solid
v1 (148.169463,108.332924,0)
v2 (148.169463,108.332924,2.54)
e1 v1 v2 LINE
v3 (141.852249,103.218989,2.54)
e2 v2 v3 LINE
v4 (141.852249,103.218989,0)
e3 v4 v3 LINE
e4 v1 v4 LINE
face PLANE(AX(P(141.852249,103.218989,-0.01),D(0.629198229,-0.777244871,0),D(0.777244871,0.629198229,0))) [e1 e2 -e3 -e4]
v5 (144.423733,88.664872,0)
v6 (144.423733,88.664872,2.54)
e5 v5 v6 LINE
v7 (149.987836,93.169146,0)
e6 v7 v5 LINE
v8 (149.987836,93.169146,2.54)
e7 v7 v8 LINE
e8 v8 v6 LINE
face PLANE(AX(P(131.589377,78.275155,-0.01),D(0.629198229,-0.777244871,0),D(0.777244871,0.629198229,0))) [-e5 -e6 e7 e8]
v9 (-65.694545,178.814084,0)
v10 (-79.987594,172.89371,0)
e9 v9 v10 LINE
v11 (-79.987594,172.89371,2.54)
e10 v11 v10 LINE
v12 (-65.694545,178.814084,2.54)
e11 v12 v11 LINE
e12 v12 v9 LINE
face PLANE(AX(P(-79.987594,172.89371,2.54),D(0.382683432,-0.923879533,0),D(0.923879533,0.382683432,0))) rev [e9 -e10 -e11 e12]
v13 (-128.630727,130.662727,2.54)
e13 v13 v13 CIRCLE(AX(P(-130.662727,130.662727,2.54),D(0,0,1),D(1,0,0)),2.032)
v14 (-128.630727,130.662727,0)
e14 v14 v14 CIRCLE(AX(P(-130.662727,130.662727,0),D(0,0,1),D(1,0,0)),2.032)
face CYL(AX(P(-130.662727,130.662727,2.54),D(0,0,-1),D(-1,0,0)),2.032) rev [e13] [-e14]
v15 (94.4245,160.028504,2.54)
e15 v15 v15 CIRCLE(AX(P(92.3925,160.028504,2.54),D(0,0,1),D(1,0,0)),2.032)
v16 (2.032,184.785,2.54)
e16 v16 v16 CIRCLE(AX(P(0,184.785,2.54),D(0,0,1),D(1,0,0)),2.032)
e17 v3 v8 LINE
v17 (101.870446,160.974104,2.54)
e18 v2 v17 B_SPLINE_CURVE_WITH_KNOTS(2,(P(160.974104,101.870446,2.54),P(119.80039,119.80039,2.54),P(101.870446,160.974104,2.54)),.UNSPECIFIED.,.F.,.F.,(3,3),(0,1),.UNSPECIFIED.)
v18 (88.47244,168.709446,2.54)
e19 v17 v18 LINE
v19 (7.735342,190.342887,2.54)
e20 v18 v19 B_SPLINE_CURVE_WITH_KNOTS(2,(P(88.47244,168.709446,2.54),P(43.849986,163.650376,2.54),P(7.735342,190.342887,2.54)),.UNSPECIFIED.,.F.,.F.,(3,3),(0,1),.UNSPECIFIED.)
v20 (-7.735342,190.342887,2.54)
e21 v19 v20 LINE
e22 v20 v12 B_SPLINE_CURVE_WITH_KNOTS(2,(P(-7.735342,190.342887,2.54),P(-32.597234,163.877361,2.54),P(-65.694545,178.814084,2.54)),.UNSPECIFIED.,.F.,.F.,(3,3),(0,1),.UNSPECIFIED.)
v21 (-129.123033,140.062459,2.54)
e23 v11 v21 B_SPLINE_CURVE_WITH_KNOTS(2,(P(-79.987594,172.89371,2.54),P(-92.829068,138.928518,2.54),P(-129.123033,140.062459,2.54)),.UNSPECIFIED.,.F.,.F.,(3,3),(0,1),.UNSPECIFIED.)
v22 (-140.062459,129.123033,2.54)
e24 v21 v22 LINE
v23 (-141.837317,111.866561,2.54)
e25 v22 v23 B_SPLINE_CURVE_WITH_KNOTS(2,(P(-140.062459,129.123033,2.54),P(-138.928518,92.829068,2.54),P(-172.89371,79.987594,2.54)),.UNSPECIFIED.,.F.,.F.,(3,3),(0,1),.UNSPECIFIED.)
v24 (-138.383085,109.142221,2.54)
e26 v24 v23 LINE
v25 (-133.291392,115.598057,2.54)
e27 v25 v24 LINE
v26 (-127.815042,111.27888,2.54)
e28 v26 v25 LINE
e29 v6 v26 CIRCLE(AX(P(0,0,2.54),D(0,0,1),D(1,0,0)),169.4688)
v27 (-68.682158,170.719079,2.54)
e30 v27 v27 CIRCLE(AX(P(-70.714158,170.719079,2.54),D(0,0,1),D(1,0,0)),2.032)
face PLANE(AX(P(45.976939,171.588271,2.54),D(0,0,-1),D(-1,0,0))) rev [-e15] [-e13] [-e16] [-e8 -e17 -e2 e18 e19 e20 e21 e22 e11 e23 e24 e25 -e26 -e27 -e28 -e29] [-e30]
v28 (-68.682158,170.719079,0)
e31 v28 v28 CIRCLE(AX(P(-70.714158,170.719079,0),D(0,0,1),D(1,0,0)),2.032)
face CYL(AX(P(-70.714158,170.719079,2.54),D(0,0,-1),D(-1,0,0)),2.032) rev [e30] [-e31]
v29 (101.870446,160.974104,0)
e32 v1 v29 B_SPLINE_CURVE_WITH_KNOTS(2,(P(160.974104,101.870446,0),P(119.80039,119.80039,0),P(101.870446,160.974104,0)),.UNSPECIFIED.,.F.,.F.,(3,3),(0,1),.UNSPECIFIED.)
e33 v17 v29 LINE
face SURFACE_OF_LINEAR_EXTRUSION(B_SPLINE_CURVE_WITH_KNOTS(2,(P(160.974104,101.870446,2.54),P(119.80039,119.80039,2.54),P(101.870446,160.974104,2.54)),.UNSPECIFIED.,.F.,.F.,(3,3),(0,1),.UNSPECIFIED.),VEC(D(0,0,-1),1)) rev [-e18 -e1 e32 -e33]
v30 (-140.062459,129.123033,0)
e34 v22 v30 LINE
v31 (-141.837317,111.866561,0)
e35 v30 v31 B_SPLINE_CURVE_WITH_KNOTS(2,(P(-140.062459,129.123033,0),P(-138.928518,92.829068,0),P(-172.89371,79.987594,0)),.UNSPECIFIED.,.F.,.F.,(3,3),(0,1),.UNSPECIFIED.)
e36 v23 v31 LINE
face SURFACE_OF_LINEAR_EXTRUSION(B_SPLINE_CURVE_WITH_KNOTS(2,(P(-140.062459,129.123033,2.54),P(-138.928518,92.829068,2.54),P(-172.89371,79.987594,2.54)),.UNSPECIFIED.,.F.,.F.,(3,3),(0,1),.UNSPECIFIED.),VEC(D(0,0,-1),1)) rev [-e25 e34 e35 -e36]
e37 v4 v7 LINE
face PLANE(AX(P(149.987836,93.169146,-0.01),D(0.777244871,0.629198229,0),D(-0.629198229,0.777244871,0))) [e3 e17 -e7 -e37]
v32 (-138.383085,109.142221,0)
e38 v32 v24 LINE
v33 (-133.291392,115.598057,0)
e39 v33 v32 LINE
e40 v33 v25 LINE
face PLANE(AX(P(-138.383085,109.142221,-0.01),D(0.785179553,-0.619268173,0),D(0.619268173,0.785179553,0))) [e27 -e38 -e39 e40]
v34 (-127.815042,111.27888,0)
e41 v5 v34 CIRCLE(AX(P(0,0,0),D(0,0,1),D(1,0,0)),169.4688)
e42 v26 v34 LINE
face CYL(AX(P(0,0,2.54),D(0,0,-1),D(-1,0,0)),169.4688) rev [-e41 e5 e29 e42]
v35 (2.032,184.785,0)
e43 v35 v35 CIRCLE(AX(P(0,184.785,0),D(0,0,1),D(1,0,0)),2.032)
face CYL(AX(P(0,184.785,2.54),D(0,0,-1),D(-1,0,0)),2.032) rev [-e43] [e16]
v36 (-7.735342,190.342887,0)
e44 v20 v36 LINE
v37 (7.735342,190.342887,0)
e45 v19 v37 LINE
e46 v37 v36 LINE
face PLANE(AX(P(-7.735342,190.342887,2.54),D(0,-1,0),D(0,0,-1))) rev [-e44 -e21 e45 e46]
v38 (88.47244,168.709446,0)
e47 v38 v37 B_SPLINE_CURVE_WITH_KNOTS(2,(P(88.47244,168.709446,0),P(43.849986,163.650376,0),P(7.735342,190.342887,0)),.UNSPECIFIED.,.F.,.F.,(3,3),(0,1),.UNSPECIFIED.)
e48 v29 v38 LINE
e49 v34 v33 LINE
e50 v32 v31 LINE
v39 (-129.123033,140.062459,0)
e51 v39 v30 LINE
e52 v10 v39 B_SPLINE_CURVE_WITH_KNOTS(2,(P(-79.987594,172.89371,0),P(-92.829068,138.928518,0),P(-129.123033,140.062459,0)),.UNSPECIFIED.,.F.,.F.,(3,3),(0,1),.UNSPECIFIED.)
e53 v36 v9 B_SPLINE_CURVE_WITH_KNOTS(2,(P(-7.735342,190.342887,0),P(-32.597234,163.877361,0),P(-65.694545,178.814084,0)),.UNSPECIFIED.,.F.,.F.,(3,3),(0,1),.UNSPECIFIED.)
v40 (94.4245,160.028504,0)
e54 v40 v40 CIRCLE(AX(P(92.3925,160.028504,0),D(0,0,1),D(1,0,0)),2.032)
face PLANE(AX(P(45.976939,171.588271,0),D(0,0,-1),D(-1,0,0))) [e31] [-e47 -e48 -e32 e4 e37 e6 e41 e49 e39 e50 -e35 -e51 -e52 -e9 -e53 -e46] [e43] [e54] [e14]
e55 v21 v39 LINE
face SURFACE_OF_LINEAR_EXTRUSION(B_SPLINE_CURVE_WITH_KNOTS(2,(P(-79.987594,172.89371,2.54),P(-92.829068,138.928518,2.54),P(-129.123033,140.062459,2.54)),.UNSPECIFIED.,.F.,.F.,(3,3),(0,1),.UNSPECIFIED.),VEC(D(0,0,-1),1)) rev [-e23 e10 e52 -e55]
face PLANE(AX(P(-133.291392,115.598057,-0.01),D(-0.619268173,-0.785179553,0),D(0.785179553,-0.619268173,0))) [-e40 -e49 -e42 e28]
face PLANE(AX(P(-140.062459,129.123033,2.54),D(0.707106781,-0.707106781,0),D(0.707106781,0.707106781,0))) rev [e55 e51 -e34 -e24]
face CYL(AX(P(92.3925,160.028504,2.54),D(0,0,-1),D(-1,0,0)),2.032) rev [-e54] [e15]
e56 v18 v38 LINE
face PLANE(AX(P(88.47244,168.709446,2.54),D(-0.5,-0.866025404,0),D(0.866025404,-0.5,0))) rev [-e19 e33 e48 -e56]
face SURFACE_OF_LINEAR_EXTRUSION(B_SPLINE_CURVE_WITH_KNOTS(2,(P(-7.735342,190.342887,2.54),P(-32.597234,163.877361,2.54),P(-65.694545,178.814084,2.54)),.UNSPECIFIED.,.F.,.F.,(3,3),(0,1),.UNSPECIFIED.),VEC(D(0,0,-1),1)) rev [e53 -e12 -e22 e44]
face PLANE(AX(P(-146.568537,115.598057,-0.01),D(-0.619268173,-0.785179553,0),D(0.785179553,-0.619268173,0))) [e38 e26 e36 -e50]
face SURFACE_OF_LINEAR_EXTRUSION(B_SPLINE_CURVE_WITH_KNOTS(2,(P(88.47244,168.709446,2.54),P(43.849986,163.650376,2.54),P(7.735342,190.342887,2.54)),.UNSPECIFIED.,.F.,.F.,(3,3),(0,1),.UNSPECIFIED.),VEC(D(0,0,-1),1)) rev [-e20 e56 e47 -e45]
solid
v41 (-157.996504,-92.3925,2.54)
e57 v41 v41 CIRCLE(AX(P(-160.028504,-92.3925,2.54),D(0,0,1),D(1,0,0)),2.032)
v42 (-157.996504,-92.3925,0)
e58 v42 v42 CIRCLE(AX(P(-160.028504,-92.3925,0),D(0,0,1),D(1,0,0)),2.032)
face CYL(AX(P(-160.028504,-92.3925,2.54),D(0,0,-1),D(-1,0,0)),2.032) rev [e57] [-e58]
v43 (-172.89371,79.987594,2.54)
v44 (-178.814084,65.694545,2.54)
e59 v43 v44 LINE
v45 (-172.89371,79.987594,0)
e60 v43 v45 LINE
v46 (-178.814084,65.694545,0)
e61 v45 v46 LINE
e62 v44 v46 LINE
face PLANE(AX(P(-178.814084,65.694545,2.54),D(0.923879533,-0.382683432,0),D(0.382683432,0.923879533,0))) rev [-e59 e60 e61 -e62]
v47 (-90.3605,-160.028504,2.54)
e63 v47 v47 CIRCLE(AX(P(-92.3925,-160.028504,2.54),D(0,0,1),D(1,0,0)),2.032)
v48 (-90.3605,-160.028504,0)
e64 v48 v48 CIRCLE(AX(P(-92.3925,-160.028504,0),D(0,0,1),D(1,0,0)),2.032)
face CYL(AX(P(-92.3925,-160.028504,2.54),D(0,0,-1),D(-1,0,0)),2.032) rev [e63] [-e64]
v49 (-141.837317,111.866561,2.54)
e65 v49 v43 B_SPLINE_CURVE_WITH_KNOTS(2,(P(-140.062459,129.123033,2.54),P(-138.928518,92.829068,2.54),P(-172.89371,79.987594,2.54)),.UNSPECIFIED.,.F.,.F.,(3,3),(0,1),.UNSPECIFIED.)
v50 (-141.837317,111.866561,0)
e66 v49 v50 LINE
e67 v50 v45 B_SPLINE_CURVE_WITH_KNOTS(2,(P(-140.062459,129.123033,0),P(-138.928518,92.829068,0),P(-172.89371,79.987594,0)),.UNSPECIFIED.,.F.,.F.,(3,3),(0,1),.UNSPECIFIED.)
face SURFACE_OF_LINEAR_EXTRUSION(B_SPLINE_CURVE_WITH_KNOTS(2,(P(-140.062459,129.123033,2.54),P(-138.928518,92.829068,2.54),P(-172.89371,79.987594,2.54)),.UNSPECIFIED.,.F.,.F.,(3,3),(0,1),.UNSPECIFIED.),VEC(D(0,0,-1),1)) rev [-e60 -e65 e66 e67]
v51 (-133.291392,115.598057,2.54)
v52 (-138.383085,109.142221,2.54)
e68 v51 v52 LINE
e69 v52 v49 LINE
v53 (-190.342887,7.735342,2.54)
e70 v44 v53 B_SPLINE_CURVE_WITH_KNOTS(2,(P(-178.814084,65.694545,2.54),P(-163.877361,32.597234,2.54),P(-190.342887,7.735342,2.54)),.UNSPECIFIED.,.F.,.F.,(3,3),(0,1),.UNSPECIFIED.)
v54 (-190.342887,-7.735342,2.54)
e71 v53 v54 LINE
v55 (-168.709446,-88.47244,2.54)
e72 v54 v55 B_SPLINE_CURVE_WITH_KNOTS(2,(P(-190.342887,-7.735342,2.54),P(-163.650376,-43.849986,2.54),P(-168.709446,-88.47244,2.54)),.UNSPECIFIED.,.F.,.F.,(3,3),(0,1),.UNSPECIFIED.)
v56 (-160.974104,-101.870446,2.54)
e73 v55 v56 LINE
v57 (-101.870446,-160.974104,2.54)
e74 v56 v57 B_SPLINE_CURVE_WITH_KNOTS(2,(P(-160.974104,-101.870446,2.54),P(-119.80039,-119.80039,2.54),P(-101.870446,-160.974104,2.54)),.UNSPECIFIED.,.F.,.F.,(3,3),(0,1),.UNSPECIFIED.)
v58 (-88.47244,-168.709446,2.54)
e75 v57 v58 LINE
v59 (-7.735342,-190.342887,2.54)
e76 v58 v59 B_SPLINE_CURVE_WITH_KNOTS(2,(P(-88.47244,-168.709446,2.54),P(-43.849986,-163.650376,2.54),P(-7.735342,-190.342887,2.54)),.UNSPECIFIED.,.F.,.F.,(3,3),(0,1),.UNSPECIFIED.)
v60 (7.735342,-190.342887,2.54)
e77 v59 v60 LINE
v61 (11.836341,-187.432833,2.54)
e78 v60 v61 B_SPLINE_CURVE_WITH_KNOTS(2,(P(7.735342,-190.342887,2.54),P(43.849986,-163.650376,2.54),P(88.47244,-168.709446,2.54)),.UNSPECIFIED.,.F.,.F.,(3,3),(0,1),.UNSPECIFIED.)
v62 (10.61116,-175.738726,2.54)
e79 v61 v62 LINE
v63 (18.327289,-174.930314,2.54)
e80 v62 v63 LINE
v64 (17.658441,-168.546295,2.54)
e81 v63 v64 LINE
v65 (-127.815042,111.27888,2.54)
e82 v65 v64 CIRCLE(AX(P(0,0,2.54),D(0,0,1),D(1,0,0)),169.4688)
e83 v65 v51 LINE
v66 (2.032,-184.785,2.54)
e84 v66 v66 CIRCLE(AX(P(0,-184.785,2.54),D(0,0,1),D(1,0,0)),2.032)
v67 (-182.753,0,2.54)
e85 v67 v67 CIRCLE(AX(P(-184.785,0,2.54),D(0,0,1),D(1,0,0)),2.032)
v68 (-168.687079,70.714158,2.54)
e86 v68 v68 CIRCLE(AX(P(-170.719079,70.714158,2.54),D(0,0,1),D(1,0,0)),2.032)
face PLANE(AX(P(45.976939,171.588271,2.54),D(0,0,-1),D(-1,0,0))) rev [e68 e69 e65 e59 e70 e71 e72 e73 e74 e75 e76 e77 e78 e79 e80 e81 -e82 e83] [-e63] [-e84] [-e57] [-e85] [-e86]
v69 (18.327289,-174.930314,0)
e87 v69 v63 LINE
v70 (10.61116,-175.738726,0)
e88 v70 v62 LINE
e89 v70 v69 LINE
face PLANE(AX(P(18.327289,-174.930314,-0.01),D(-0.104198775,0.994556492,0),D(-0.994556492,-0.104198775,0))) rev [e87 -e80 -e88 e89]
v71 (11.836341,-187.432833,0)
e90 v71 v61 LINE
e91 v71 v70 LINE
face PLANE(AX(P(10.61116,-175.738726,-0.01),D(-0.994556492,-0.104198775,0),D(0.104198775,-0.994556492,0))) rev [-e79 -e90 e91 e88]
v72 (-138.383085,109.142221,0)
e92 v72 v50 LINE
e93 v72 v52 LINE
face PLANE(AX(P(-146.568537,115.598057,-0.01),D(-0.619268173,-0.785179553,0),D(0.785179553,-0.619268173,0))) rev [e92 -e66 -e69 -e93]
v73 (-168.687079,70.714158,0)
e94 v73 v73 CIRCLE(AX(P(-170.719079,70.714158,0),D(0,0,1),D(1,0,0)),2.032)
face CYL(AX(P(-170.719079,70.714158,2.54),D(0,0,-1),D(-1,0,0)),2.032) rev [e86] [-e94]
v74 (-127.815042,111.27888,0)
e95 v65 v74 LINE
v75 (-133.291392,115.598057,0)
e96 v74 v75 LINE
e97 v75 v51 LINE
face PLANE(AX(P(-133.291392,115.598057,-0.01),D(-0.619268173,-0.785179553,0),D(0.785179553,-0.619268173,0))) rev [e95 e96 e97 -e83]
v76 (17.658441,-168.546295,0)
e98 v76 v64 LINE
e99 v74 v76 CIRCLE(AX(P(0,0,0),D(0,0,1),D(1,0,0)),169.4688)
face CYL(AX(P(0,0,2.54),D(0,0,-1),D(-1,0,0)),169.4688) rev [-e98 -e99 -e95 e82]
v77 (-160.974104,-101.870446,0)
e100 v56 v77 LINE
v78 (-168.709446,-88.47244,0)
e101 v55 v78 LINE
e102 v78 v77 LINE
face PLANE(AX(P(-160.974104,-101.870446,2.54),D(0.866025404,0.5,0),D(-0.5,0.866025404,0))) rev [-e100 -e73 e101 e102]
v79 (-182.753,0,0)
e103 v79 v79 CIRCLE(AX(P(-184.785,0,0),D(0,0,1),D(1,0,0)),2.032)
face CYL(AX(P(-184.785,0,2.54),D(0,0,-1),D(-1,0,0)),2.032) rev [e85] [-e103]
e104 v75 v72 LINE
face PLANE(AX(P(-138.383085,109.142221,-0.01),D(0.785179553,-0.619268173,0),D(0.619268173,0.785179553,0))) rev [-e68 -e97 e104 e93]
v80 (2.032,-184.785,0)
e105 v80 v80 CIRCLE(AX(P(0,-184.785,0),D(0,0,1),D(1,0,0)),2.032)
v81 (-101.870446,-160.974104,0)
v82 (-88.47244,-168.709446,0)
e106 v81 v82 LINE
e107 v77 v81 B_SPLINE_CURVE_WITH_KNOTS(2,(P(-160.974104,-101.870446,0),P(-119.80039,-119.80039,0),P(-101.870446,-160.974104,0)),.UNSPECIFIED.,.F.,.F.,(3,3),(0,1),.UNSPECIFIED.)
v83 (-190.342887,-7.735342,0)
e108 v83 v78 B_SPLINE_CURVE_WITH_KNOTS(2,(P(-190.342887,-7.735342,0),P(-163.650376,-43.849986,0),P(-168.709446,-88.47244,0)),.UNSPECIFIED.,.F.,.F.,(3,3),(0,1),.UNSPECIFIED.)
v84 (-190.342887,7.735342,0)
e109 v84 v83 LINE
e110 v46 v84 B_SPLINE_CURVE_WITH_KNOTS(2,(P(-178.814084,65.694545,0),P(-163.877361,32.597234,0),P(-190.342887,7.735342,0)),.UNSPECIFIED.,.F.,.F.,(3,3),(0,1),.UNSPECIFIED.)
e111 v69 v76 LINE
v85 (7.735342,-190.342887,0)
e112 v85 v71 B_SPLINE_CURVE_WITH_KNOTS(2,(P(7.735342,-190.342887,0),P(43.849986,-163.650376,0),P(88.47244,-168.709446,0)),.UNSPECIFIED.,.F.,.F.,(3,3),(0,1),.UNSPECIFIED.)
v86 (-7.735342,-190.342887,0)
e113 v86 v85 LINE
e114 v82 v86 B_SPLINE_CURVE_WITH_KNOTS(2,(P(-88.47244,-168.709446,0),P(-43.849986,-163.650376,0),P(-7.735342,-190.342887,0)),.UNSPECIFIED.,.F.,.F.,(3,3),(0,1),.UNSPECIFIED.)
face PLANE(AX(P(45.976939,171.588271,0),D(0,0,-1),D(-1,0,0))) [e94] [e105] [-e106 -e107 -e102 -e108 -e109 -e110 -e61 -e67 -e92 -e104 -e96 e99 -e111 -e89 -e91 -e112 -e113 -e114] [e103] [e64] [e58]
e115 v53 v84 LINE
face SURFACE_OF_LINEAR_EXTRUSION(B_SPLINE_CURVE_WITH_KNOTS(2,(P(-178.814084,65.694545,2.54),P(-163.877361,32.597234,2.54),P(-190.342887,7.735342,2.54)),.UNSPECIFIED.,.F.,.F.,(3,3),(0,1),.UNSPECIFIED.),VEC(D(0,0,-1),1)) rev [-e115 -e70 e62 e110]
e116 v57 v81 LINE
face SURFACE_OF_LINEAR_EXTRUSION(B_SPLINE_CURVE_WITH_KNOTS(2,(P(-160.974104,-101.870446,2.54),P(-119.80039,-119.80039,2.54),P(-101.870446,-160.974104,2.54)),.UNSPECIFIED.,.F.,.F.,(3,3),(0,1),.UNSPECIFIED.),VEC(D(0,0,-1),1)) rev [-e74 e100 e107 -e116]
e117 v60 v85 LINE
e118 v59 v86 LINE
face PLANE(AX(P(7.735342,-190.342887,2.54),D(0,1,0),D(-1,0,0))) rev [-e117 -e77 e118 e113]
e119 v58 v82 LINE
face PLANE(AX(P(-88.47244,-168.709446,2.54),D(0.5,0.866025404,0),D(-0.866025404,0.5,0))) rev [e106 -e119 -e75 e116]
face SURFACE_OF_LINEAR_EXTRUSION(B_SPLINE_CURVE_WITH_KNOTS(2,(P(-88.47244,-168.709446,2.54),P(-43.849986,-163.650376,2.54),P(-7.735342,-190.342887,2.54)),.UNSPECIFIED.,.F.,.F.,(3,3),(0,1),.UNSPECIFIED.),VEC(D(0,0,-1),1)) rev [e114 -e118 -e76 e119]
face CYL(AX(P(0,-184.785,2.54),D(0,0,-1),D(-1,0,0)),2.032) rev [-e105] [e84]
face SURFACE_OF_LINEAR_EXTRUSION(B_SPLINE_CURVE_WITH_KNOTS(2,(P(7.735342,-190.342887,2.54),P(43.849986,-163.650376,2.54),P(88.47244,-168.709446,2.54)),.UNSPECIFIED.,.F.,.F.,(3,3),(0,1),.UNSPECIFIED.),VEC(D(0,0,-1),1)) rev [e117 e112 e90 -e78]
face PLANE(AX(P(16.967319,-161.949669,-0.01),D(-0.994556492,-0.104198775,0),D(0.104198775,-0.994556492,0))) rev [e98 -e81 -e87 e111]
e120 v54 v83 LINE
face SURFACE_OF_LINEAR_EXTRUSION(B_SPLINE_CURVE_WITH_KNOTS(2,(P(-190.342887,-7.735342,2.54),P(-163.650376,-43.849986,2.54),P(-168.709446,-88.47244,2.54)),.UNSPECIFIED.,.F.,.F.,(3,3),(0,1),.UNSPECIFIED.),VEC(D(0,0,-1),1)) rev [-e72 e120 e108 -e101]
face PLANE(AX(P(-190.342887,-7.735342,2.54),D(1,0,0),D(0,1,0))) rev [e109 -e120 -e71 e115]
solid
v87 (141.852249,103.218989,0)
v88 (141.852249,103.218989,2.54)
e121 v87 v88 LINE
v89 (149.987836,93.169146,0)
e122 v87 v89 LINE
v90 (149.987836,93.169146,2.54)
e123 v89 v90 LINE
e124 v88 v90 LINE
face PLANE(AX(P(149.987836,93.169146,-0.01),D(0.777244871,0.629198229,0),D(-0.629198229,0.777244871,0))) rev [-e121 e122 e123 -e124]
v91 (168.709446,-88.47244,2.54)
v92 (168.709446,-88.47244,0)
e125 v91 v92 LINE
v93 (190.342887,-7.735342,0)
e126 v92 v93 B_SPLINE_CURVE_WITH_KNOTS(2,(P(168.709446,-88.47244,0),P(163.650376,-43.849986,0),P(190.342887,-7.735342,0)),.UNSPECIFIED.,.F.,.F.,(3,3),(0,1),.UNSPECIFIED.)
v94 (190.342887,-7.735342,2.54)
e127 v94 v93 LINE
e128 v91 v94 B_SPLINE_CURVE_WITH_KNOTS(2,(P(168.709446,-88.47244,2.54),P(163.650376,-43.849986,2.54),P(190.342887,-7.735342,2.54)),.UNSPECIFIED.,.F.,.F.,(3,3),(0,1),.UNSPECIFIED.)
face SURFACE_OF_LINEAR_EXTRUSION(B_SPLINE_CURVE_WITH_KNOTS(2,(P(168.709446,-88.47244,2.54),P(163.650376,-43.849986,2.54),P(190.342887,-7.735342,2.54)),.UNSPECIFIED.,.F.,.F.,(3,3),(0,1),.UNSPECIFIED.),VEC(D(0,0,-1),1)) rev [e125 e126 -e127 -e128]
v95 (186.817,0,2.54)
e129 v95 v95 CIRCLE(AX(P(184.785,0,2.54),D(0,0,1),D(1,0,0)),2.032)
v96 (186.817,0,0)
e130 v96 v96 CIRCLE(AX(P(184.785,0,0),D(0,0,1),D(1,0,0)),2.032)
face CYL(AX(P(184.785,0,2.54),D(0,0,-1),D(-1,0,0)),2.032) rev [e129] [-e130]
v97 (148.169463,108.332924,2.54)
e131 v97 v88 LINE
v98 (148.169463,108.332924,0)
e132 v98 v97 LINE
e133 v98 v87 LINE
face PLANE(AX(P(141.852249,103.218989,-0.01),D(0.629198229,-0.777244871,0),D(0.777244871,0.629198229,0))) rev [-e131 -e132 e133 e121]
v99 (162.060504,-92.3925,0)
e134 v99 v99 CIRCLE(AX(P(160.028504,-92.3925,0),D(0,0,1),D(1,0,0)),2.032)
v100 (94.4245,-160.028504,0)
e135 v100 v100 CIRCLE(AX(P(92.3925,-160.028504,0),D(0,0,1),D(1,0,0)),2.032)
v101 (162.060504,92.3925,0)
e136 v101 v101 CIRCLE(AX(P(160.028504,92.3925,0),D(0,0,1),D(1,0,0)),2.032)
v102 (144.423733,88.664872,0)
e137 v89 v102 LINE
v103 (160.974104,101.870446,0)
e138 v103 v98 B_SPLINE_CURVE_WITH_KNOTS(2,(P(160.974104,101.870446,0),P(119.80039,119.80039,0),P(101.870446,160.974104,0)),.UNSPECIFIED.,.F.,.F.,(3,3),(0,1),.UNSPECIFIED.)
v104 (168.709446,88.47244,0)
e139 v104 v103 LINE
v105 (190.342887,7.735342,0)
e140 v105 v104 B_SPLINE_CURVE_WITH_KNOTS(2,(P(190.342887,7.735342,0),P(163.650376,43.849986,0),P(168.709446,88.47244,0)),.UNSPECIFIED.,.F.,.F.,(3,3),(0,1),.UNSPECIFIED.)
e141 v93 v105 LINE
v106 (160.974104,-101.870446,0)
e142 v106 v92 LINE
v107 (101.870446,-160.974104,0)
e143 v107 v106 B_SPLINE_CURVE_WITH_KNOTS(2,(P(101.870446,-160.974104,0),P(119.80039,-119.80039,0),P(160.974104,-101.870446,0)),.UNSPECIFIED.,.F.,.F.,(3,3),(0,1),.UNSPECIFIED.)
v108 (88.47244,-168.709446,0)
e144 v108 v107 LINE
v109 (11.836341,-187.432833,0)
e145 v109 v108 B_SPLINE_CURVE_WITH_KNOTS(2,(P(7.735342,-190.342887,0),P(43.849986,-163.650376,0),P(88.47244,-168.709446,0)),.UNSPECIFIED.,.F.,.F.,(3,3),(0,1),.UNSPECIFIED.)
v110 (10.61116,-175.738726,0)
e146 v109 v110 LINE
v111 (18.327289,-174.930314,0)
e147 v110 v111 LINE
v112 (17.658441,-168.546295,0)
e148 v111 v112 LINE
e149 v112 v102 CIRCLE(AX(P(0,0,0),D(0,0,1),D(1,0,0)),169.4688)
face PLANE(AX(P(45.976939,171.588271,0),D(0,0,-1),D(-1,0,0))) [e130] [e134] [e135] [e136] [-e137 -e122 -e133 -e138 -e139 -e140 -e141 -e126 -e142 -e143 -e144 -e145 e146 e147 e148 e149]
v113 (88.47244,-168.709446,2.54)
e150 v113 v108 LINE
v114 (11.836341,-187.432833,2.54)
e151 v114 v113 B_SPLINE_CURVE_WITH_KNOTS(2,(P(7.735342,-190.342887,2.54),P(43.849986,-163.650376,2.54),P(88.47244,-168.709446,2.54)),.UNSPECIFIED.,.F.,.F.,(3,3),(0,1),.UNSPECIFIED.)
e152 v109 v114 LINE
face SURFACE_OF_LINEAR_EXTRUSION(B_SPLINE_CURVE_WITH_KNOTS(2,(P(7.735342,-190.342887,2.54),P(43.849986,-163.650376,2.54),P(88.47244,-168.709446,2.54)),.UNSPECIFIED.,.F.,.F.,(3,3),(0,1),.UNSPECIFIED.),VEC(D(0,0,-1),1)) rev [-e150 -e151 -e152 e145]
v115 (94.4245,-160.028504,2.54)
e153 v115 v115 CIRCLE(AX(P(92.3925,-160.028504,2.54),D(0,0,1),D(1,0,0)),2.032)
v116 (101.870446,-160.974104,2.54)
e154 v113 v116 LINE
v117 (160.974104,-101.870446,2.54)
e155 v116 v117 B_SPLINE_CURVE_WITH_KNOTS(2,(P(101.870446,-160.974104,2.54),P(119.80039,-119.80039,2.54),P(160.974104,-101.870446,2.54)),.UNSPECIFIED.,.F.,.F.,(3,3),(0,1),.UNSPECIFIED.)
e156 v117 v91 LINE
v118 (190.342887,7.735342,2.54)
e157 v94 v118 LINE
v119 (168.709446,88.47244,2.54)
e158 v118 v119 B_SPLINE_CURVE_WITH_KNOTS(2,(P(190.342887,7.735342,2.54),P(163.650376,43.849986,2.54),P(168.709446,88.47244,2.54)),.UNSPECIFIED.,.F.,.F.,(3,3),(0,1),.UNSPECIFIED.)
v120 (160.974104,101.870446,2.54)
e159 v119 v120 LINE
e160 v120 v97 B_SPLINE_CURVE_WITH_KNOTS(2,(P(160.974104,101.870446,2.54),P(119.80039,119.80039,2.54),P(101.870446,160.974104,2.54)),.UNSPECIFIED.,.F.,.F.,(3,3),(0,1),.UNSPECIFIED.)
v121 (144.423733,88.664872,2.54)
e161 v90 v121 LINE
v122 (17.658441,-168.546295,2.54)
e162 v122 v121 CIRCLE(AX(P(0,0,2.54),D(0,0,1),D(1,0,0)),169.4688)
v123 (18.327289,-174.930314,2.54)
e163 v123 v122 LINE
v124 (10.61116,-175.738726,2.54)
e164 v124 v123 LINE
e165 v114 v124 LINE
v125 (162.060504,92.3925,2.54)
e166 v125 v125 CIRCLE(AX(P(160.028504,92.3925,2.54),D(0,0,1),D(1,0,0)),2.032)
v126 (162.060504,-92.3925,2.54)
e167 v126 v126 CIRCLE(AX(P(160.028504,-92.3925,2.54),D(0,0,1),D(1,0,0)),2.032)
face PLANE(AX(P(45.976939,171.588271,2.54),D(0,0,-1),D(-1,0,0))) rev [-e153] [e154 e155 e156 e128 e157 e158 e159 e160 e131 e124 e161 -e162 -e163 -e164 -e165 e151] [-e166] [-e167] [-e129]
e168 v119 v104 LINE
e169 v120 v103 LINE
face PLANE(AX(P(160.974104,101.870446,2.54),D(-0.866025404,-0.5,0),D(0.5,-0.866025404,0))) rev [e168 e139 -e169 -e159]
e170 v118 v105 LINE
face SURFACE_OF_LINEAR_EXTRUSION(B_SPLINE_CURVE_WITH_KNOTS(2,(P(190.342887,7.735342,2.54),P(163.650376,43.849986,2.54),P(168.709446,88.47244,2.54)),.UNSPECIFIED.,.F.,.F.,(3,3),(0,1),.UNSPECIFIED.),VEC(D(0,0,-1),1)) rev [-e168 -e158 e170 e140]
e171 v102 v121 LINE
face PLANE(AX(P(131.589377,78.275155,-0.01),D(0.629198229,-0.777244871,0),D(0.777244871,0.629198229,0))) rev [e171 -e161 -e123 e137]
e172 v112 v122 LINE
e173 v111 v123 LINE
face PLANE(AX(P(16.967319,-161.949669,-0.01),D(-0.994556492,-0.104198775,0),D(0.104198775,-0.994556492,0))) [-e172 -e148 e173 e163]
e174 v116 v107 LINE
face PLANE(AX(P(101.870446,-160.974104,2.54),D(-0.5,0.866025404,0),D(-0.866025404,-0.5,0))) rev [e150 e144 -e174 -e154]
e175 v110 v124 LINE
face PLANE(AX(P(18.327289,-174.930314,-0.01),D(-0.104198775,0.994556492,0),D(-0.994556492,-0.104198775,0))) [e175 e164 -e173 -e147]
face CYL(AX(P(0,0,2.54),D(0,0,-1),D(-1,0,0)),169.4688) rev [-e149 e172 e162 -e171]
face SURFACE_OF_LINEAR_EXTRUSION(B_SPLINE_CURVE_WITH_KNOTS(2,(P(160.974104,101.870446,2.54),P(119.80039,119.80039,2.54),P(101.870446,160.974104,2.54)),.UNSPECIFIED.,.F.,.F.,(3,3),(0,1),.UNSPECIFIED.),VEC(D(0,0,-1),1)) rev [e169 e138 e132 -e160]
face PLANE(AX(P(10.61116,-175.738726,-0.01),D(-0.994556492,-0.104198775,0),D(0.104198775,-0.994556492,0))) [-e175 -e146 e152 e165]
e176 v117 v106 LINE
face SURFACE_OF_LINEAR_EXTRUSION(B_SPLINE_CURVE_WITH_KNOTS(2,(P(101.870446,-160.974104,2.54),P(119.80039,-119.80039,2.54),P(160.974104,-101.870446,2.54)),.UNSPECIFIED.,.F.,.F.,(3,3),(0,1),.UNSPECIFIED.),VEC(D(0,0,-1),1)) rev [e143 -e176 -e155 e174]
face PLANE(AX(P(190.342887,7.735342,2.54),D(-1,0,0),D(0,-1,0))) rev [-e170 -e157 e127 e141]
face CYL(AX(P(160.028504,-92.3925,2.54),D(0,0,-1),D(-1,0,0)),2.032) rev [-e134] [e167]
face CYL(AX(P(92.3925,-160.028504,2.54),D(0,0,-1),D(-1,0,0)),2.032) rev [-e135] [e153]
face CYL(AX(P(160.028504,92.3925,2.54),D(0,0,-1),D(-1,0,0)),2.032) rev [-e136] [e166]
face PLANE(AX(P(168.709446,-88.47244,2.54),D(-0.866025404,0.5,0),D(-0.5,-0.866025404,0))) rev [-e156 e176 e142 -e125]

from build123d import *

# Parameters (mm, degrees)
SKETCH4_R           = 169.4688
SKETCH4_R_2         = 2.032
BOSS_EXTRUDE2_DEPTH = 2.54
SPLIT1_OUTLINE_R    = 2.032
SPLIT1_DEPTH        = 2.54
SPLIT1_2_OUTLINE_R  = 2.032
SPLIT1_2_DEPTH      = 2.54
SPLIT1_3_OUTLINE_R  = 2.032
SPLIT1_3_DEPTH      = 2.54


# Read off the part's stored shape, not the designer's step: Split1
with BuildPart() as part:
    # Sketch4 → Boss-Extrude2 (new body)
    with BuildSketch(Plane.XY):
        with BuildLine():
            Line((-7.735342369, 190.342886598), (7.735342369, 190.342886598))
            add(Edge.make_bspline(
                [(7.735342369, 190.342886598), (43.849986057, 163.650375876), (88.472440301, 168.709446408)],
                knots=[0, 0, 0, 1, 1, 1], degree=2))
            Line((88.472440301, 168.709446408), (101.870446297, 160.974104039))
            add(Edge.make_bspline(
                [(101.870446297, 160.974104039), (119.800389819, 119.800389819), (160.974104039, 101.870446297)],
                knots=[0, 0, 0, 1, 1, 1], degree=2))
            Line((160.974104039, 101.870446297), (168.709446408, 88.472440301))
            add(Edge.make_bspline(
                [(168.709446408, 88.472440301), (163.650375876, 43.849986057), (190.342886598, 7.735342369)],
                knots=[0, 0, 0, 1, 1, 1], degree=2))
            Line((190.342886598, 7.735342369), (190.342886598, -7.735342369))
            add(Edge.make_bspline(
                [(190.342886598, -7.735342369), (163.650375876, -43.849986057), (168.709446408, -88.472440301)],
                knots=[0, 0, 0, 1, 1, 1], degree=2))
            Line((168.709446408, -88.472440301), (160.974104039, -101.870446297))
            add(Edge.make_bspline(
                [(160.974104039, -101.870446297), (119.800389819, -119.800389819), (101.870446297, -160.974104039)],
                knots=[0, 0, 0, 1, 1, 1], degree=2))
            Line((101.870446297, -160.974104039), (88.472440301, -168.709446408))
            add(Edge.make_bspline(
                [(88.472440301, -168.709446408), (43.849986057, -163.650375876), (7.735342369, -190.342886598)],
                knots=[0, 0, 0, 1, 1, 1], degree=2))
            Line((7.735342369, -190.342886598), (-7.735342369, -190.342886598))
            add(Edge.make_bspline(
                [(-7.735342369, -190.342886598), (-43.849986057, -163.650375876), (-88.472440301, -168.709446408)],
                knots=[0, 0, 0, 1, 1, 1], degree=2))
            Line((-88.472440301, -168.709446408), (-101.870446297, -160.974104039))
            add(Edge.make_bspline(
                [(-101.870446297, -160.974104039), (-119.800389819, -119.800389819), (-160.974104039, -101.870446297)],
                knots=[0, 0, 0, 1, 1, 1], degree=2))
            Line((-160.974104039, -101.870446297), (-168.709446408, -88.472440301))
            add(Edge.make_bspline(
                [(-168.709446408, -88.472440301), (-163.650375876, -43.849986057), (-190.342886598, -7.735342369)],
                knots=[0, 0, 0, 1, 1, 1], degree=2))
            Line((-190.342886598, -7.735342369), (-190.342886598, 7.735342369))
            add(Edge.make_bspline(
                [(-190.342886598, 7.735342369), (-163.877360858, 32.597233808), (-178.814084455, 65.694544678)],
                knots=[0, 0, 0, 1, 1, 1], degree=2))
            Line((-178.814084455, 65.694544678), (-172.893709719, 79.987593661))
            add(Edge.make_bspline(
                [(-172.893709719, 79.987593661), (-138.92851822, 92.829068072), (-140.062458908, 129.12303282)],
                knots=[0, 0, 0, 1, 1, 1], degree=2))
            Line((-140.062458908, 129.12303282), (-129.12303282, 140.062458908))
            add(Edge.make_bspline(
                [(-129.12303282, 140.062458908), (-92.829068072, 138.92851822), (-79.987593661, 172.893709719)],
                knots=[0, 0, 0, 1, 1, 1], degree=2))
            Line((-79.987593661, 172.893709719), (-65.694544678, 178.814084455))
            add(Edge.make_bspline(
                [(-65.694544678, 178.814084455), (-32.597233808, 163.877360858), (-7.735342369, 190.342886598)],
                knots=[0, 0, 0, 1, 1, 1], degree=2))
        make_face()
        Circle(SKETCH4_R, mode=Mode.SUBTRACT)
        with Locations((0, 184.785)):
            Circle(SKETCH4_R_2, mode=Mode.SUBTRACT)
        with Locations((-160.028504238, -92.3925)):
            Circle(SKETCH4_R_2, mode=Mode.SUBTRACT)
        with Locations((-92.3925, -160.028504238)):
            Circle(SKETCH4_R_2, mode=Mode.SUBTRACT)
        with Locations((0, -184.785)):
            Circle(SKETCH4_R_2, mode=Mode.SUBTRACT)
        with Locations((92.3925, -160.028504238)):
            Circle(SKETCH4_R_2, mode=Mode.SUBTRACT)
        with Locations((160.028504238, -92.3925)):
            Circle(SKETCH4_R_2, mode=Mode.SUBTRACT)
        with Locations((184.785, 0)):
            Circle(SKETCH4_R_2, mode=Mode.SUBTRACT)
        with Locations((160.028504238, 92.3925)):
            Circle(SKETCH4_R_2, mode=Mode.SUBTRACT)
        with Locations((92.3925, 160.028504238)):
            Circle(SKETCH4_R_2, mode=Mode.SUBTRACT)
        with Locations((-70.71415805, 170.719079415)):
            Circle(SKETCH4_R_2, mode=Mode.SUBTRACT)
        with Locations((-130.662726562, 130.662726562)):
            Circle(SKETCH4_R_2, mode=Mode.SUBTRACT)
        with Locations((-170.719079415, 70.71415805)):
            Circle(SKETCH4_R_2, mode=Mode.SUBTRACT)
        with Locations((-184.785, 0)):
            Circle(SKETCH4_R_2, mode=Mode.SUBTRACT)
    extrude(amount=BOSS_EXTRUDE2_DEPTH)

    # Split1 2 outline → Split1 2 (cut)
    with BuildSketch(Plane.XY):
        with BuildLine():
            Line((-138.383085321, 109.142221195), (-133.291392081, 115.59805664))
            Line((-133.291392081, 115.59805664), (-127.815042264, 111.278880047))
            ThreePointArc((-127.815042264, 111.278880047), (150.363397658, 78.169833172), (17.658441351, -168.546295191))
            Line((17.658441351, -168.546295191), (18.327289217, -174.930314459))
            Line((18.327289217, -174.930314459), (10.611160262, -175.73872624))
            Line((10.611160262, -175.73872624), (11.836341153, -187.432833101))
            add(Edge.make_bspline(
                [(11.836341153, -187.432833101), (46.366816835, -163.935721553), (88.472440301, -168.709446408)],
                knots=[0.056402787, 0.056402787, 0.056402787, 1, 1, 1], degree=2))
            Line((88.472440301, -168.709446408), (101.870446297, -160.974104039))
            add(Edge.make_bspline(
                [(101.870446297, -160.974104039), (119.800389819, -119.800389819), (160.974104039, -101.870446297)],
                knots=[0, 0, 0, 1, 1, 1], degree=2))
            Line((160.974104039, -101.870446297), (168.709446408, -88.472440301))
            add(Edge.make_bspline(
                [(168.709446408, -88.472440301), (163.650375876, -43.849986057), (190.342886598, -7.735342369)],
                knots=[0, 0, 0, 1, 1, 1], degree=2))
            Line((190.342886598, -7.735342369), (190.342886598, 7.735342369))
            add(Edge.make_bspline(
                [(190.342886598, 7.735342369), (163.650375876, 43.849986057), (168.709446408, 88.472440301)],
                knots=[0, 0, 0, 1, 1, 1], degree=2))
            Line((168.709446408, 88.472440301), (160.974104039, 101.870446297))
            add(Edge.make_bspline(
                [(160.974104039, 101.870446297), (119.800389819, 119.800389819), (101.870446297, 160.974104039)],
                knots=[0, 0, 0, 1, 1, 1], degree=2))
            Line((101.870446297, 160.974104039), (88.472440301, 168.709446408))
            add(Edge.make_bspline(
                [(88.472440301, 168.709446408), (43.849986057, 163.650375876), (7.735342369, 190.342886598)],
                knots=[0, 0, 0, 1, 1, 1], degree=2))
            Line((7.735342369, 190.342886598), (-7.735342369, 190.342886598))
            add(Edge.make_bspline(
                [(-7.735342369, 190.342886598), (-32.597233808, 163.877360858), (-65.694544678, 178.814084455)],
                knots=[0, 0, 0, 1, 1, 1], degree=2))
            Line((-65.694544678, 178.814084455), (-79.987593661, 172.893709719))
            add(Edge.make_bspline(
                [(-79.987593661, 172.893709719), (-92.829068072, 138.92851822), (-129.12303282, 140.062458908)],
                knots=[0, 0, 0, 1, 1, 1], degree=2))
            Line((-129.12303282, 140.062458908), (-140.062458908, 129.12303282))
            add(Edge.make_bspline(
                [(-140.062458908, 129.12303282), (-139.768216299, 119.70522905), (-141.837317072, 111.866560842)],
                knots=[0, 0, 0, 0.259486772, 0.259486772, 0.259486772], degree=2))
            Line((-141.837317072, 111.866560842), (-138.383085321, 109.142221195))
        make_face()
        with Locations((92.3925, -160.028504238)):
            Circle(SPLIT1_2_OUTLINE_R, mode=Mode.SUBTRACT)
        with Locations((160.028504238, -92.3925)):
            Circle(SPLIT1_2_OUTLINE_R, mode=Mode.SUBTRACT)
        with Locations((184.785, 0)):
            Circle(SPLIT1_2_OUTLINE_R, mode=Mode.SUBTRACT)
        with Locations((-130.662726562, 130.662726562)):
            Circle(SPLIT1_2_OUTLINE_R, mode=Mode.SUBTRACT)
        with Locations((-70.71415805, 170.719079415)):
            Circle(SPLIT1_2_OUTLINE_R, mode=Mode.SUBTRACT)
        with Locations((0, 184.785)):
            Circle(SPLIT1_2_OUTLINE_R, mode=Mode.SUBTRACT)
        with Locations((160.028504238, 92.3925)):
            Circle(SPLIT1_2_OUTLINE_R, mode=Mode.SUBTRACT)
        with Locations((92.3925, 160.028504238)):
            Circle(SPLIT1_2_OUTLINE_R, mode=Mode.SUBTRACT)
    extrude(amount=SPLIT1_2_DEPTH, mode=Mode.SUBTRACT)


with BuildPart() as body_2:
    # Split1 outline → Split1 (new body)
    with BuildSketch(Plane.XY):
        with BuildLine():
            add(Edge.make_bspline(
                [(-140.062458908, 129.12303282), (-139.768216299, 119.70522905), (-141.837317072, 111.866560842)],
                knots=[0, 0, 0, 0.259486772, 0.259486772, 0.259486772], degree=2))
            Line((-141.837317072, 111.866560842), (-138.383085321, 109.142221195))
            Line((-138.383085321, 109.142221195), (-133.291392081, 115.59805664))
            Line((-133.291392081, 115.59805664), (-127.815042264, 111.278880047))
            ThreePointArc((-127.815042264, 111.278880047), (14.028916423, 168.887132954), (144.423733134, 88.664871742))
            Line((144.423733134, 88.664871742), (149.987836319, 93.169145748))
            Line((149.987836319, 93.169145748), (141.852248686, 103.218989295))
            Line((141.852248686, 103.218989295), (148.169462586, 108.332924357))
            add(Edge.make_bspline(
                [(148.169462586, 108.332924357), (116.877911093, 126.51147085), (101.870446297, 160.974104039)],
                knots=[0.162994307, 0.162994307, 0.162994307, 1, 1, 1], degree=2))
            Line((101.870446297, 160.974104039), (88.472440301, 168.709446408))
            add(Edge.make_bspline(
                [(88.472440301, 168.709446408), (43.849986057, 163.650375876), (7.735342369, 190.342886598)],
                knots=[0, 0, 0, 1, 1, 1], degree=2))
            Line((7.735342369, 190.342886598), (-7.735342369, 190.342886598))
            add(Edge.make_bspline(
                [(-7.735342369, 190.342886598), (-32.597233808, 163.877360858), (-65.694544678, 178.814084455)],
                knots=[0, 0, 0, 1, 1, 1], degree=2))
            Line((-65.694544678, 178.814084455), (-79.987593661, 172.893709719))
            add(Edge.make_bspline(
                [(-79.987593661, 172.893709719), (-92.829068072, 138.92851822), (-129.12303282, 140.062458908)],
                knots=[0, 0, 0, 1, 1, 1], degree=2))
            Line((-129.12303282, 140.062458908), (-140.062458908, 129.12303282))
        make_face()
        with Locations((-130.662726562, 130.662726562)):
            Circle(SPLIT1_OUTLINE_R, mode=Mode.SUBTRACT)
        with Locations((-70.71415805, 170.719079415)):
            Circle(SPLIT1_OUTLINE_R, mode=Mode.SUBTRACT)
        with Locations((0, 184.785)):
            Circle(SPLIT1_OUTLINE_R, mode=Mode.SUBTRACT)
        with Locations((92.3925, 160.028504238)):
            Circle(SPLIT1_OUTLINE_R, mode=Mode.SUBTRACT)
    extrude(amount=SPLIT1_DEPTH)


with BuildPart() as body_3:
    # Split1 3 outline → Split1 3 (new body)
    with BuildSketch(Plane.XY):
        with BuildLine():
            Line((148.169462586, 108.332924357), (141.852248686, 103.218989295))
            Line((141.852248686, 103.218989295), (149.987836319, 93.169145748))
            Line((149.987836319, 93.169145748), (144.423733134, 88.664871742))
            ThreePointArc((144.423733134, 88.664871742), (152.010045458, -74.917422895), (17.658441351, -168.546295191))
            Line((17.658441351, -168.546295191), (18.327289217, -174.930314459))
            Line((18.327289217, -174.930314459), (10.611160262, -175.73872624))
            Line((10.611160262, -175.73872624), (11.836341153, -187.432833101))
            add(Edge.make_bspline(
                [(11.836341153, -187.432833101), (46.366816835, -163.935721553), (88.472440301, -168.709446408)],
                knots=[0.056402787, 0.056402787, 0.056402787, 1, 1, 1], degree=2))
            Line((88.472440301, -168.709446408), (101.870446297, -160.974104039))
            add(Edge.make_bspline(
                [(101.870446297, -160.974104039), (119.800389819, -119.800389819), (160.974104039, -101.870446297)],
                knots=[0, 0, 0, 1, 1, 1], degree=2))
            Line((160.974104039, -101.870446297), (168.709446408, -88.472440301))
            add(Edge.make_bspline(
                [(168.709446408, -88.472440301), (163.650375876, -43.849986057), (190.342886598, -7.735342369)],
                knots=[0, 0, 0, 1, 1, 1], degree=2))
            Line((190.342886598, -7.735342369), (190.342886598, 7.735342369))
            add(Edge.make_bspline(
                [(190.342886598, 7.735342369), (163.650375876, 43.849986057), (168.709446408, 88.472440301)],
                knots=[0, 0, 0, 1, 1, 1], degree=2))
            Line((168.709446408, 88.472440301), (160.974104039, 101.870446297))
            add(Edge.make_bspline(
                [(160.974104039, 101.870446297), (154.263023008, 104.792925023), (148.169462586, 108.332924357)],
                knots=[0, 0, 0, 0.162994307, 0.162994307, 0.162994307], degree=2))
        make_face()
        with Locations((92.3925, -160.028504238)):
            Circle(SPLIT1_3_OUTLINE_R, mode=Mode.SUBTRACT)
        with Locations((160.028504238, -92.3925)):
            Circle(SPLIT1_3_OUTLINE_R, mode=Mode.SUBTRACT)
        with Locations((184.785, 0)):
            Circle(SPLIT1_3_OUTLINE_R, mode=Mode.SUBTRACT)
        with Locations((160.028504238, 92.3925)):
            Circle(SPLIT1_3_OUTLINE_R, mode=Mode.SUBTRACT)
    extrude(amount=SPLIT1_3_DEPTH)


solid = Compound([part.part, body_2.part, body_3.part])
